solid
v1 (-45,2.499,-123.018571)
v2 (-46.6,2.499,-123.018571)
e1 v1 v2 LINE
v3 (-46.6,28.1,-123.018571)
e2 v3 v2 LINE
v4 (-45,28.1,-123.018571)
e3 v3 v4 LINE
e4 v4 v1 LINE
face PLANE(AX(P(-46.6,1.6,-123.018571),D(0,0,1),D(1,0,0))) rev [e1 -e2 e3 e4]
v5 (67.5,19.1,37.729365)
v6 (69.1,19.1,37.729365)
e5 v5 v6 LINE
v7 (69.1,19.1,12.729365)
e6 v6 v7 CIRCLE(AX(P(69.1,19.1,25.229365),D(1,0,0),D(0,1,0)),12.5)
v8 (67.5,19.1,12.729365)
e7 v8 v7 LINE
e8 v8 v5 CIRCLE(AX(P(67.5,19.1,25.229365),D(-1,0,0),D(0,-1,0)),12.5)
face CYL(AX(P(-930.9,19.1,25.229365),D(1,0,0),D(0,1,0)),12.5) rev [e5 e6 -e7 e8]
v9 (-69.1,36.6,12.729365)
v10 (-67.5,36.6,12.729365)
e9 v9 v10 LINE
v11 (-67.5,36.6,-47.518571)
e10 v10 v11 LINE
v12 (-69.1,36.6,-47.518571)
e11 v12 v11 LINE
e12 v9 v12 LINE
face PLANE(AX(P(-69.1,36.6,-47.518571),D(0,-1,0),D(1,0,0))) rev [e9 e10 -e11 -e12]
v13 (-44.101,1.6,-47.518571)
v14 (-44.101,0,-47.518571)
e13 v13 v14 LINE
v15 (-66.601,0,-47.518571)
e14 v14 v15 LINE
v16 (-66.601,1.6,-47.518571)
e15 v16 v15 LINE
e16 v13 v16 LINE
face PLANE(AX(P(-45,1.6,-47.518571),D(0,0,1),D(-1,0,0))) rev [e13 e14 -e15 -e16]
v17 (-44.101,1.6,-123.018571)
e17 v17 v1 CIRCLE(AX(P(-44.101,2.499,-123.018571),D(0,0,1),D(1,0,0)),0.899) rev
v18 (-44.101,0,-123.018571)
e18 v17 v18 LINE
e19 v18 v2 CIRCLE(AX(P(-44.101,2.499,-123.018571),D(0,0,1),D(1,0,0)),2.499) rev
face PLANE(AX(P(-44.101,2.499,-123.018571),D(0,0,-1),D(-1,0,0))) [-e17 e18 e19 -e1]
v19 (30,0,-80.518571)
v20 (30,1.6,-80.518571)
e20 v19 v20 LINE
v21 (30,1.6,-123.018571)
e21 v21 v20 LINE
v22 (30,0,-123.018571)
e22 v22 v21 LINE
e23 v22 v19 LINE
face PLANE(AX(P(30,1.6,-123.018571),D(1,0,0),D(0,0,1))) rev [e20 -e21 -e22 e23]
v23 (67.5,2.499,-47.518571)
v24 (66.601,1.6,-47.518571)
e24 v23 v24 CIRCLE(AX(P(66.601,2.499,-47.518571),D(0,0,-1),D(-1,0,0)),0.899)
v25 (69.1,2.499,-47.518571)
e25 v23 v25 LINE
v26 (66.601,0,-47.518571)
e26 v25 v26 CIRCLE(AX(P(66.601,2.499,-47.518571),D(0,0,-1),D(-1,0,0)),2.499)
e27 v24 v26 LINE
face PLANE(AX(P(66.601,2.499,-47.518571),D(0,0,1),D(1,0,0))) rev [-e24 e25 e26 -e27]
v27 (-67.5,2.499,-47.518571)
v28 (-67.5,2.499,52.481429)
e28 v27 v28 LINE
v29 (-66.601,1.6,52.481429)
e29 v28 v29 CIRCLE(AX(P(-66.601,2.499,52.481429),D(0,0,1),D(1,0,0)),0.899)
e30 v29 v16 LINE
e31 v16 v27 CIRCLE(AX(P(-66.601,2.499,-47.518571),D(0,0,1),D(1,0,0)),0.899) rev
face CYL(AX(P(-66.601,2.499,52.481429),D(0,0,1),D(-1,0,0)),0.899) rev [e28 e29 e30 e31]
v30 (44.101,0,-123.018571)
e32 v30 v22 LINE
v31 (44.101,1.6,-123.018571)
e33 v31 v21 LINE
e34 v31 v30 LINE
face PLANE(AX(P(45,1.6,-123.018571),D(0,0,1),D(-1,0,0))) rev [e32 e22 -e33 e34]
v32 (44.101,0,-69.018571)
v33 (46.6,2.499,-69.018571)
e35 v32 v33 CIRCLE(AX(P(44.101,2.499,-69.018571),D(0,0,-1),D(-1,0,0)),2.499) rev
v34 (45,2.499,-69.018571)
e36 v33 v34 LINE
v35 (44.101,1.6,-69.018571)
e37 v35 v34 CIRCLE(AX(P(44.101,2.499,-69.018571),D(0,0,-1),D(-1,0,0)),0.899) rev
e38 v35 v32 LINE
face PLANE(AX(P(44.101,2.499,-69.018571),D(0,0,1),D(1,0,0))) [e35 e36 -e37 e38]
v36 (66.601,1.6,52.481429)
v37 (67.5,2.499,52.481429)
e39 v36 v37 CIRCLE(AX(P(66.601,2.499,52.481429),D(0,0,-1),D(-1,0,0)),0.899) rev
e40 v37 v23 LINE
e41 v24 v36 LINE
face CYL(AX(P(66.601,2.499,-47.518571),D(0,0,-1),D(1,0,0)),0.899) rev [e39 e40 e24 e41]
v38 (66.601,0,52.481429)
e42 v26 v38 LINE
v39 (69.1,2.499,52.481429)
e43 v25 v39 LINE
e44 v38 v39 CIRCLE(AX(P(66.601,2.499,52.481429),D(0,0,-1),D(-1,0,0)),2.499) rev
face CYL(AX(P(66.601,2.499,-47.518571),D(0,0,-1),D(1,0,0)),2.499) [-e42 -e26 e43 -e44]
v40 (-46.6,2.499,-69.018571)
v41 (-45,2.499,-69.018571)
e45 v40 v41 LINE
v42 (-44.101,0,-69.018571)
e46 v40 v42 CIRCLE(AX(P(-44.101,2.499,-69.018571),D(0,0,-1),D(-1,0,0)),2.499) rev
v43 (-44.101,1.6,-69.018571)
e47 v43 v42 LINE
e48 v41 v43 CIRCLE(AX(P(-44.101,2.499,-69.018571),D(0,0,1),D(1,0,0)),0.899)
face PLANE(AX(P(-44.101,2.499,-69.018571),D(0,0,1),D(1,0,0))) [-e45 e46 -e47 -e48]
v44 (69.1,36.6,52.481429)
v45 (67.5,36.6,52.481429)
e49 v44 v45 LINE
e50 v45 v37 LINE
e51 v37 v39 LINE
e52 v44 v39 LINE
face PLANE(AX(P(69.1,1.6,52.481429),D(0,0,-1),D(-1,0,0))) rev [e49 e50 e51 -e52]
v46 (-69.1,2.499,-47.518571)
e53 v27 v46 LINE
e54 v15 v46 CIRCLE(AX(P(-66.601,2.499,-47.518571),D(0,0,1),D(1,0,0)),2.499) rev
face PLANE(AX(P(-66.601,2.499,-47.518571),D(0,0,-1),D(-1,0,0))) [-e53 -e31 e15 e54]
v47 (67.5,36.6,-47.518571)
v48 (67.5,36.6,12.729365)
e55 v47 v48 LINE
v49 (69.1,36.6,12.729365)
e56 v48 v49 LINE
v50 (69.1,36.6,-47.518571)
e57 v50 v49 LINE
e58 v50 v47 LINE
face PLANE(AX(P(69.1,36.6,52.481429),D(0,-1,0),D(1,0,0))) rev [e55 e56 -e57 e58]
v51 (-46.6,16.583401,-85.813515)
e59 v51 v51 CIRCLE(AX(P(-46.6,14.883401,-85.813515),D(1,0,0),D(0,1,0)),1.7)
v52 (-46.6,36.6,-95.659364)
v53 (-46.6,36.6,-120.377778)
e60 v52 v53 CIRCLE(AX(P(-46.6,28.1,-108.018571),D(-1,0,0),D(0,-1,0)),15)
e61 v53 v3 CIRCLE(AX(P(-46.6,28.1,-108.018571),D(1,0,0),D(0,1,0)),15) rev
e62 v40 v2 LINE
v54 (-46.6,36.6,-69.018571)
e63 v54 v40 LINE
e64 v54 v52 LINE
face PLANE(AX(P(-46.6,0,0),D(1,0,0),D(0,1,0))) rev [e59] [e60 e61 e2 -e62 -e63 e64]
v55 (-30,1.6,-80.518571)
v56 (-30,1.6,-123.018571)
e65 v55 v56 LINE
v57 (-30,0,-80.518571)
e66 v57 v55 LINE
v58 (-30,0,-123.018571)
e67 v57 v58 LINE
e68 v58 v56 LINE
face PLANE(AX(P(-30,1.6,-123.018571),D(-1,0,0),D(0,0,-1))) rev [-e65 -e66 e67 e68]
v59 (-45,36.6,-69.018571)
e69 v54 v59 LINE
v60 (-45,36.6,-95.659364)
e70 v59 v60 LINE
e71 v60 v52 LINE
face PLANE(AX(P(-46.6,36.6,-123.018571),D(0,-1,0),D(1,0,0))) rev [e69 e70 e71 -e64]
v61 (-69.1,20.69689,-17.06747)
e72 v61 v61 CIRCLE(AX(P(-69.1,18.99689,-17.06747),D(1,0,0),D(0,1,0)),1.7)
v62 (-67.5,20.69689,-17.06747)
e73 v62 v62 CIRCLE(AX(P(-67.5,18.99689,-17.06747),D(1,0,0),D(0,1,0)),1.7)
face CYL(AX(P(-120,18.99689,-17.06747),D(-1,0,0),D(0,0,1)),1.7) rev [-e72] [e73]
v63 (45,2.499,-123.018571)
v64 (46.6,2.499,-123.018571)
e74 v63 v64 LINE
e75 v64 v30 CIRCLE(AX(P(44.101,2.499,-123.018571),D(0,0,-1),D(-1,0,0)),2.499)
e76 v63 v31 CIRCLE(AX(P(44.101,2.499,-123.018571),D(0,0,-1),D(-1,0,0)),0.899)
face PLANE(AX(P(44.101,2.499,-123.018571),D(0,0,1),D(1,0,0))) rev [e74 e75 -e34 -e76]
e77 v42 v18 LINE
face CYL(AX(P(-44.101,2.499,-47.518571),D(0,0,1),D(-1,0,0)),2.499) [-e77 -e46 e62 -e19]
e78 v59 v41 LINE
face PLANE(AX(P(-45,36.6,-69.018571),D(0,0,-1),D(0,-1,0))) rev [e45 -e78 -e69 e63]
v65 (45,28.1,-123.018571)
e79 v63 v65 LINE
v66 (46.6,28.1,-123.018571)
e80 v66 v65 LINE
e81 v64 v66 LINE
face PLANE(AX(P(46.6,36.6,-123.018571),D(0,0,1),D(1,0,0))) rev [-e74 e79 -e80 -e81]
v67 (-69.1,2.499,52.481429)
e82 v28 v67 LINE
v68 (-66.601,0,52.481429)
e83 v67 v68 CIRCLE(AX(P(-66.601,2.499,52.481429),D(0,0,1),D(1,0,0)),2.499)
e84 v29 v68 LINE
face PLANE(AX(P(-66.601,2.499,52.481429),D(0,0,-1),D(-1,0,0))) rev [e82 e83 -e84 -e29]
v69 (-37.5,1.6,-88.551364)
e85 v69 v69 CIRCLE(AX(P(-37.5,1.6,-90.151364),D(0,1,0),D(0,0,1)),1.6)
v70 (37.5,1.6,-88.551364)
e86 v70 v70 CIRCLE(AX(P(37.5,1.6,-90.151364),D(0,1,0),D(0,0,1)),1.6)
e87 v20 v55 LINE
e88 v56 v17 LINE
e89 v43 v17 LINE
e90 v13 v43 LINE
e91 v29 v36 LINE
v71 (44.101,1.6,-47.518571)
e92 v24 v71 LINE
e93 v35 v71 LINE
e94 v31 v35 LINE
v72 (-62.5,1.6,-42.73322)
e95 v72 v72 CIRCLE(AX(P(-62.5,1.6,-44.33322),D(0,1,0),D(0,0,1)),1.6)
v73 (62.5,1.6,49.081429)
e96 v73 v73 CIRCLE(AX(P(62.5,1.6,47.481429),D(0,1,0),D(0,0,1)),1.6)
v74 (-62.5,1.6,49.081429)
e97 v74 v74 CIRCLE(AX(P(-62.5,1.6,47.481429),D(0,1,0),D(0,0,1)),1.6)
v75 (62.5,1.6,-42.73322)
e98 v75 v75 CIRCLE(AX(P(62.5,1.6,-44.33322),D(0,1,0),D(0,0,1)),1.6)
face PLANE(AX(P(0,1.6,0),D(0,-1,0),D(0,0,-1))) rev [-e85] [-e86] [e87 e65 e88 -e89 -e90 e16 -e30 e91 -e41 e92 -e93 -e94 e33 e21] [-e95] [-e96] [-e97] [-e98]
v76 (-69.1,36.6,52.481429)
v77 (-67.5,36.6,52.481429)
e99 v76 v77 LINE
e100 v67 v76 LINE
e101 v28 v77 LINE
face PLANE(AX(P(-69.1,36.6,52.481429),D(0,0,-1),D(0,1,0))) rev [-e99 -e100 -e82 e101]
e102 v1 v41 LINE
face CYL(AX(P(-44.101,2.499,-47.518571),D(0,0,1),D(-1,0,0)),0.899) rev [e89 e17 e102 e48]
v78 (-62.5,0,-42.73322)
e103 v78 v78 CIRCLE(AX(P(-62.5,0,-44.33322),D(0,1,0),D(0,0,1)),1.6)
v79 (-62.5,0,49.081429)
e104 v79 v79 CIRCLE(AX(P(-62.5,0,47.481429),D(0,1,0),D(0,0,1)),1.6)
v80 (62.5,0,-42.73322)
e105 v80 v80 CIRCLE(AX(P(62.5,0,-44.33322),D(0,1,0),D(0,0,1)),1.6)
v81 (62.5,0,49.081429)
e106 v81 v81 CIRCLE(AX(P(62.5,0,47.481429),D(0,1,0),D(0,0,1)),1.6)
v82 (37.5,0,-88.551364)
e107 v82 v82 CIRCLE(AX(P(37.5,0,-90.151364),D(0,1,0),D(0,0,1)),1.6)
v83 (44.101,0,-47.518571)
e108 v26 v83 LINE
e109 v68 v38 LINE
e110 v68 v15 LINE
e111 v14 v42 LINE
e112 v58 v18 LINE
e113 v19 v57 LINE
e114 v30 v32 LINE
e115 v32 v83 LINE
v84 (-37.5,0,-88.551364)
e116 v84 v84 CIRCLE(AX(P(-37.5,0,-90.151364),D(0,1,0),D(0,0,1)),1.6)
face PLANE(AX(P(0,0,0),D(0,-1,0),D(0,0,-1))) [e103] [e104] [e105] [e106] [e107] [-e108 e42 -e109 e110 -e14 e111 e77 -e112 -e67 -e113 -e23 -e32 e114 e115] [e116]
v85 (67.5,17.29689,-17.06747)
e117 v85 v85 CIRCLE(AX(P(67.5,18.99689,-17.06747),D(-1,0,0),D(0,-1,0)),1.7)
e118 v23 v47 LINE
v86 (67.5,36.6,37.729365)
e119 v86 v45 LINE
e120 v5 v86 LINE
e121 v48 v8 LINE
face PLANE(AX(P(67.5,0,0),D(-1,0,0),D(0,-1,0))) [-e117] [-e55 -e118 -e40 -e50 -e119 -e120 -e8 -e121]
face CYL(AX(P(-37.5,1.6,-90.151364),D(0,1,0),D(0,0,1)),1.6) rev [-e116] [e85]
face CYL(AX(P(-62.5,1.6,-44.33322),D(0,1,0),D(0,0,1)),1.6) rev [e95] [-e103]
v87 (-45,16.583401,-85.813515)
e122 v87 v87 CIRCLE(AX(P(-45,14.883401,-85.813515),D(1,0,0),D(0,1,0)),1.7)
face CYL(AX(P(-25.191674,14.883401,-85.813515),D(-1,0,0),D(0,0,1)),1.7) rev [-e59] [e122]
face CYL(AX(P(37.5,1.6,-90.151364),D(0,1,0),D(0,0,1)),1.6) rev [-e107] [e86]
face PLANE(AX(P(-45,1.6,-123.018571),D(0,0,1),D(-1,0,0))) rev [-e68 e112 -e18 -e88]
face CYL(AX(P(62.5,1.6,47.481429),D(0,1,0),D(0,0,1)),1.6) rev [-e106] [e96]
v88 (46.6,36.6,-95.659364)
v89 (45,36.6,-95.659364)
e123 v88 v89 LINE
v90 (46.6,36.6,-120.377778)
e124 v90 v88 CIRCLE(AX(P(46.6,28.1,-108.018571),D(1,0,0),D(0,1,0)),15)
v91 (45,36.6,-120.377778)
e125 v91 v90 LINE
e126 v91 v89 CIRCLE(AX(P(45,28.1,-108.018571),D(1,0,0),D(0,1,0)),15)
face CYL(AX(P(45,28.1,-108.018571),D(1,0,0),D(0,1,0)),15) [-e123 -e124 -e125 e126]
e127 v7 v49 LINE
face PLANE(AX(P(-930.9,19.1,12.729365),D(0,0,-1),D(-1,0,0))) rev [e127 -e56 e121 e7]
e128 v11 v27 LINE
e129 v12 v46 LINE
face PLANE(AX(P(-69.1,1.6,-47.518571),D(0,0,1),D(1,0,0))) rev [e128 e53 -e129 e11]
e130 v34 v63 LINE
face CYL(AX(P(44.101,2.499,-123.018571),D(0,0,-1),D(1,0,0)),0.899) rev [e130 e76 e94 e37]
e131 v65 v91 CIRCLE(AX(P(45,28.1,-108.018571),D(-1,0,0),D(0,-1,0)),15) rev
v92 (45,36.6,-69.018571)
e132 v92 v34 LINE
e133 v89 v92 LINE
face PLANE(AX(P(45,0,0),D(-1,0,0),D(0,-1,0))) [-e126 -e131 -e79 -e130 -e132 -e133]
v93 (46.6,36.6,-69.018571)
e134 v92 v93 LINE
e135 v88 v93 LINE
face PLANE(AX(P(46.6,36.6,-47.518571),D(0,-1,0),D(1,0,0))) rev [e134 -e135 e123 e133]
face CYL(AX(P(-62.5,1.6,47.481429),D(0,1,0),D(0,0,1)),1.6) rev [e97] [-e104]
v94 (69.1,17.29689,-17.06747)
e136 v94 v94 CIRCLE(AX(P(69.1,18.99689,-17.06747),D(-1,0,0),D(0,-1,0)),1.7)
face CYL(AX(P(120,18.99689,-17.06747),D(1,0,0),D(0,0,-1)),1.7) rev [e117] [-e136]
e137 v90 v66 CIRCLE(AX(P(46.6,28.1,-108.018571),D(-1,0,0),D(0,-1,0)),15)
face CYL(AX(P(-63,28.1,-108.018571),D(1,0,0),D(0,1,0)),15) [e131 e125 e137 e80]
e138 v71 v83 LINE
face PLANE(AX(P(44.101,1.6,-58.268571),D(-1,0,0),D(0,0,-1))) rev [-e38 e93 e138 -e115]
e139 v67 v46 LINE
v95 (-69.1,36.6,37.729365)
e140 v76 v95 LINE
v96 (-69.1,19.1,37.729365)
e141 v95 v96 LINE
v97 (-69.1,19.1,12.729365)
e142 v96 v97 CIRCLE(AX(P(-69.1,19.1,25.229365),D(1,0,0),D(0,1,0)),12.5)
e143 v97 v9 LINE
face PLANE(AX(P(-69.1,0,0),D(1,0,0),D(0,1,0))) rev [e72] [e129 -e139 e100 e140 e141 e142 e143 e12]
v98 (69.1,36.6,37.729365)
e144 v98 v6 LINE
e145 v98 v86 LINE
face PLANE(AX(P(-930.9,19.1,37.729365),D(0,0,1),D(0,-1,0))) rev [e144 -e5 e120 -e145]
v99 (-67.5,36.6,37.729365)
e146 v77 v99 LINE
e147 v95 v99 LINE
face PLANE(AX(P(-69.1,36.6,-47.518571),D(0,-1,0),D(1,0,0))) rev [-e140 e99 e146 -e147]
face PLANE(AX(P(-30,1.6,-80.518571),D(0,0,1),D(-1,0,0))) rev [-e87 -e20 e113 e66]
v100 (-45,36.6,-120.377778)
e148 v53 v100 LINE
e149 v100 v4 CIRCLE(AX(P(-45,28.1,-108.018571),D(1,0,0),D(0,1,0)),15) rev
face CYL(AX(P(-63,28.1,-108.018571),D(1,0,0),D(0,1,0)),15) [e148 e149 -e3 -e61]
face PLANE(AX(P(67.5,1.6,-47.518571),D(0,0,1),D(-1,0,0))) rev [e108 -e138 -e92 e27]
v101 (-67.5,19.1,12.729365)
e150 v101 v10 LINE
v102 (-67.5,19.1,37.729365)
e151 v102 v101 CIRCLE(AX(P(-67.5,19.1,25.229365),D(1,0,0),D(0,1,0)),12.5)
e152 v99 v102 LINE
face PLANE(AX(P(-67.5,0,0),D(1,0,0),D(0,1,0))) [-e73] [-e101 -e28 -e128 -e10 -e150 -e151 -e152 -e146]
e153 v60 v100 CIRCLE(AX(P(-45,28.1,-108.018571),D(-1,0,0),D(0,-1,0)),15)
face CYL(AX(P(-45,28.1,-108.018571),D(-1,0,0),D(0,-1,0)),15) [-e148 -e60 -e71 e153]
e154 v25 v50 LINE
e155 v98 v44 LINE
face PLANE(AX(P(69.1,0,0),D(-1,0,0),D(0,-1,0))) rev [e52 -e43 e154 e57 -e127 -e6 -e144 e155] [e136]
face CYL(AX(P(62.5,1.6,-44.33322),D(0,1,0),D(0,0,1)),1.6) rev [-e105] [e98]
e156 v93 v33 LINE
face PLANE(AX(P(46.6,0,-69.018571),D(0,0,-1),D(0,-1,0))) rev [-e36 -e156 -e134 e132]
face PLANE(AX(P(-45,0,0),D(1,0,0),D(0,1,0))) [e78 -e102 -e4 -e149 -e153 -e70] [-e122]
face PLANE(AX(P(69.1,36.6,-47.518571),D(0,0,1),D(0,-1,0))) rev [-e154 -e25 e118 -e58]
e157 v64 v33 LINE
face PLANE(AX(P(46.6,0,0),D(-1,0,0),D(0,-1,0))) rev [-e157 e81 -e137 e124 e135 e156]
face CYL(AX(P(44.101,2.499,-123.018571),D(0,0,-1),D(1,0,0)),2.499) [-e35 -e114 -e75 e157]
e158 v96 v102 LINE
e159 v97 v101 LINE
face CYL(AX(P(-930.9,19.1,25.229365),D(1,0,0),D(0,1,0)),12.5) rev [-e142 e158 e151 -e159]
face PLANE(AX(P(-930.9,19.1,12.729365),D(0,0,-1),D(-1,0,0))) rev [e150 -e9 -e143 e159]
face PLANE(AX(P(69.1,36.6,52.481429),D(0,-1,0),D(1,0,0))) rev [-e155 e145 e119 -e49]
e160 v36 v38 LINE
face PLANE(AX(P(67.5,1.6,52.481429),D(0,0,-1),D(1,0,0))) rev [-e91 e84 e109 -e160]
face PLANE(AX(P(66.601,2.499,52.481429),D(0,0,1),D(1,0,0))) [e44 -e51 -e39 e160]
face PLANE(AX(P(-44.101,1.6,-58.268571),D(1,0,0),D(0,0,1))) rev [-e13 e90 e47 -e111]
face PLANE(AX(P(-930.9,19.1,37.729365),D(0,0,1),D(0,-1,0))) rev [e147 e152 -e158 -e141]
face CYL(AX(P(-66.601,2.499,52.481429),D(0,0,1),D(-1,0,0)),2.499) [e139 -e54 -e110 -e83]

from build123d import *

# Parameters (mm, degrees)
BOSS_EXTRUDE2_DEPTH            = 1.6
EDGE_FLANGE1_STRIP_W           = 8.198
EDGE_FLANGE1_STRIP_H           = 1.6
EDGE_FLANGE1_STRIP_CUT_DEPTH   = 100
EDGE_FLANGE1_STRIP_2_W         = 8.198
EDGE_FLANGE1_STRIP_2_H         = 1.6
EDGE_FLANGE1_STRIP_CUT_2_DEPTH = 75.5
EDGE_FLANGE1_STRIP_3_W         = 8.198
EDGE_FLANGE1_STRIP_3_H         = 1.6
EDGE_FLANGE1_STRIP_CUT_3_DEPTH = 75.5
EDGE_FLANGE1_STRIP_4_W         = 8.198
EDGE_FLANGE1_STRIP_4_H         = 1.6
EDGE_FLANGE1_STRIP_CUT_4_DEPTH = 100
EDGE_FLANGE1_DEPTH             = 100
EDGE_FLANGE1_BEND_DEPTH        = 75.5
EDGE_FLANGE1_BEND_2_DEPTH      = 75.5
EDGE_FLANGE1_BEND_3_DEPTH      = 100
CUT_EXTRUDE1_START             = -69.018571159
CUT_EXTRUDE1_DEPTH             = 21.5
SKETCH24_R                     = 15
BOSS_EXTRUDE3_DEPTH            = 1.6
BOSS_EXTRUDE4_START            = -1.6
SKETCH25_R                     = 15
BOSS_EXTRUDE4_DEPTH            = 1.6
CUT_EXTRUDE2_DEPTH             = 109.6
CUT_EXTRUDE3_DEPTH             = 1000
M3_CLEARANCE_HOLE1_D           = 3.2
HOLE1_D                        = 3.4
HOLE1_DEPTH                    = 67.5
HOLE1_CBORE_D                  = 6
HOLE1_CBORE_DEPTH              = 16
CUT_EXTRUDE4_REACH             = 180.195
SKETCH36_R                     = 1.7


# Read off the part's stored shape, not the designer's step: Cut-Extrude1
# Sheet-metal steps are written as plain solids
with BuildPart() as part:
    # Sketch1 → Boss-Extrude2 (new body)
    with BuildSketch(Plane(origin=(0, 0, 0), x_dir=(1, 0, 0), z_dir=(0, 1, 0))):
        Polygon((45, 47.518571159), (45, 123.018571159), (30, 123.018571159), (30, 80.518571159), (-30, 80.518571159), (-30, 123.018571159), (-45, 123.018571159), (-45, 47.518571159), (-67.5, 47.518571159), (-67.5, -52.481428841), (67.5, -52.481428841), (67.5, 47.518571159), align=None)
    extrude(amount=BOSS_EXTRUDE2_DEPTH)

    # Edge-Flange1 strip (across the edge) → Edge-Flange1 strip cut (cut)
    with BuildSketch(Plane(origin=(-67.5, 1.6, -47.518571159), x_dir=(1, 0, 0), z_dir=(0, 0, 1))):
        with Locations((-3.2, -0.8)):
            Rectangle(EDGE_FLANGE1_STRIP_W, EDGE_FLANGE1_STRIP_H)
    extrude(amount=EDGE_FLANGE1_STRIP_CUT_DEPTH, mode=Mode.SUBTRACT)

    # Edge-Flange1 strip 2 (across the edge) → Edge-Flange1 strip cut 2 (cut)
    with BuildSketch(Plane(origin=(-45, 1.6, -123.018571159), x_dir=(1, 0, 0), z_dir=(0, 0, 1))):
        with Locations((-3.2, -0.8)):
            Rectangle(EDGE_FLANGE1_STRIP_2_W, EDGE_FLANGE1_STRIP_2_H)
    extrude(amount=EDGE_FLANGE1_STRIP_CUT_2_DEPTH, mode=Mode.SUBTRACT)

    # Edge-Flange1 strip 3 (across the edge) → Edge-Flange1 strip cut 3 (cut)
    with BuildSketch(Plane(origin=(45, 1.6, -47.518571159), x_dir=(-1, 0, 0), z_dir=(0, 0, -1))):
        with Locations((-3.2, -0.8)):
            Rectangle(EDGE_FLANGE1_STRIP_3_W, EDGE_FLANGE1_STRIP_3_H)
    extrude(amount=EDGE_FLANGE1_STRIP_CUT_3_DEPTH, mode=Mode.SUBTRACT)

    # Edge-Flange1 strip 4 (across the edge) → Edge-Flange1 strip cut 4 (cut)
    with BuildSketch(Plane(origin=(67.5, 1.6, 52.481428841), x_dir=(-1, 0, 0), z_dir=(0, 0, -1))):
        with Locations((-3.2, -0.8)):
            Rectangle(EDGE_FLANGE1_STRIP_4_W, EDGE_FLANGE1_STRIP_4_H)
    extrude(amount=EDGE_FLANGE1_STRIP_CUT_4_DEPTH, mode=Mode.SUBTRACT)

    # Edge-Flange1 section (across the edge) → Edge-Flange1 (add)
    with BuildSketch(Plane(origin=(-67.5, 1.6, -47.518571159), x_dir=(1, 0, 0), z_dir=(0, 0, 1))):
        with BuildLine():
            Line((-1.6, 0.899), (-1.6, 35))
            Line((-1.6, 35), (0, 35))
            Line((0, 35), (0, 0.899))
            ThreePointArc((0, 0.899), (0.263311004, 0.263311004), (0.899, 0))
            Line((0.899, 0), (0.899, -1.6))
            ThreePointArc((0.899, -1.6), (-0.868059846, -0.868059846), (-1.6, 0.899))
        make_face()
    extrude(amount=EDGE_FLANGE1_DEPTH)

    # Edge-Flange1 section 2 (across the edge) → Edge-Flange1 bend (add)
    with BuildSketch(Plane(origin=(-45, 1.6, -123.018571159), x_dir=(1, 0, 0), z_dir=(0, 0, 1))):
        with BuildLine():
            Line((-1.6, 0.899), (-1.6, 35))
            Line((-1.6, 35), (0, 35))
            Line((0, 35), (0, 0.899))
            ThreePointArc((0, 0.899), (0.263311004, 0.263311004), (0.899, 0))
            Line((0.899, 0), (0.899, -1.6))
            ThreePointArc((0.899, -1.6), (-0.868059846, -0.868059846), (-1.6, 0.899))
        make_face()
    extrude(amount=EDGE_FLANGE1_BEND_DEPTH)

    # Edge-Flange1 section 3 (across the edge) → Edge-Flange1 bend 2 (add)
    with BuildSketch(Plane(origin=(45, 1.6, -47.518571159), x_dir=(-1, 0, 0), z_dir=(0, 0, -1))):
        with BuildLine():
            Line((-1.6, 0.899), (-1.6, 35))
            Line((-1.6, 35), (0, 35))
            Line((0, 35), (0, 0.899))
            ThreePointArc((0, 0.899), (0.263311004, 0.263311004), (0.899, 0))
            Line((0.899, 0), (0.899, -1.6))
            ThreePointArc((0.899, -1.6), (-0.868059846, -0.868059846), (-1.6, 0.899))
        make_face()
    extrude(amount=EDGE_FLANGE1_BEND_2_DEPTH)

    # Edge-Flange1 section 4 (across the edge) → Edge-Flange1 bend 3 (add)
    with BuildSketch(Plane(origin=(67.5, 1.6, 52.481428841), x_dir=(-1, 0, 0), z_dir=(0, 0, -1))):
        with BuildLine():
            Line((-1.6, 0.899), (-1.6, 35))
            Line((-1.6, 35), (0, 35))
            Line((0, 35), (0, 0.899))
            ThreePointArc((0, 0.899), (0.263311004, 0.263311004), (0.899, 0))
            Line((0.899, 0), (0.899, -1.6))
            ThreePointArc((0.899, -1.6), (-0.868059846, -0.868059846), (-1.6, 0.899))
        make_face()
    extrude(amount=EDGE_FLANGE1_BEND_3_DEPTH)

    # Cut-Extrude1 outline → Cut-Extrude1 (cut)
    with BuildSketch(Plane.XY.offset(CUT_EXTRUDE1_START)):
        with BuildLine():
            ThreePointArc((45, 2.499), (44.736688996, 1.863311004), (44.101, 1.6))
            Line((44.101, 1.6), (44.101, 0))
            ThreePointArc((44.101, 0), (45.868059846, 0.731940154), (46.6, 2.499))
            Line((46.6, 2.499), (46.6, 36.6))
            Line((46.6, 36.6), (45, 36.6))
            Line((45, 36.6), (45, 2.499))
        make_face()
        with BuildLine():
            ThreePointArc((-46.6, 2.499), (-45.868059846, 0.731940154), (-44.101, 0))
            Line((-44.101, 0), (-44.101, 1.6))
            ThreePointArc((-44.101, 1.6), (-44.736688996, 1.863311004), (-45, 2.499))
            Line((-45, 2.499), (-45, 36.6))
            Line((-45, 36.6), (-46.6, 36.6))
            Line((-46.6, 36.6), (-46.6, 2.499))
        make_face()
    extrude(amount=CUT_EXTRUDE1_DEPTH, mode=Mode.SUBTRACT)

    # Sketch24 → Boss-Extrude3 (add)
    with BuildSketch(Plane(origin=(46.6, 0, 0), x_dir=(0, 0, -1), z_dir=(1, 0, 0))):
        with Locations((108.018571159, 28.1)):
            Circle(SKETCH24_R)
    extrude(amount=-BOSS_EXTRUDE3_DEPTH)

    # Sketch25 → Boss-Extrude4 (add)
    with BuildSketch(Plane.ZY.offset(46.6).offset(BOSS_EXTRUDE4_START)):
        with Locations((-108.018571159, 28.1)):
            Circle(SKETCH25_R)
    extrude(amount=BOSS_EXTRUDE4_DEPTH)

    # Sketch26 → Cut-Extrude2 (cut)
    with BuildSketch(Plane(origin=(46.6, 0, 0), x_dir=(0, 0, -1), z_dir=(1, 0, 0))):
        with BuildLine():
            Line((120.377778253, 36.6), (123.018571159, 36.6))
            Line((123.018571159, 36.6), (123.018571159, 28.1))
            ThreePointArc((123.018571159, 28.1), (122.343167251, 32.550387263), (120.377778253, 36.6))
        make_face()
    extrude(amount=-CUT_EXTRUDE2_DEPTH, mode=Mode.SUBTRACT)

    # Sketch27 → Cut-Extrude3 (cut)
    with BuildSketch(Plane(origin=(69.1, 0, 0), x_dir=(0, 0, -1), z_dir=(1, 0, 0))):
        with BuildLine():
            Line((-37.729365474, 19.100000095), (-37.729365474, 36.6))
            Line((-37.729365474, 36.6), (-12.729365474, 36.6))
            Line((-12.729365474, 36.6), (-12.729365474, 19.100000095))
            ThreePointArc((-12.729365474, 19.100000095), (-25.229365474, 6.600000095), (-37.729365474, 19.100000095))
        make_face()
    extrude(amount=-CUT_EXTRUDE3_DEPTH, mode=Mode.SUBTRACT)

    # M3 Clearance Hole1 (through all)
    with Locations(Plane(origin=(0, 1.6, -32.518571159), x_dir=(-1, 0, 0), z_dir=(0, 1, 0))):
        with Locations((-62.5, -11.814648696), (62.5, -11.814648696), (62.5, 80), (-62.5, 80), (-37.5, -57.632792906), (37.5, -57.632792906)):
            Hole(M3_CLEARANCE_HOLE1_D / 2)

    # Hole1
    with Locations(Plane(origin=(120, 6.6, -32.518571159), x_dir=(0, 0, 1), z_dir=(1, 0, 0))):
        with Locations((15.451100734, -12.39688985)):
            hole1 = CounterBoreHole(HOLE1_D / 2, HOLE1_CBORE_D / 2, HOLE1_CBORE_DEPTH, depth=HOLE1_DEPTH)

    # Mirror1: Hole1 across Right Plane
    add(hole1.mirror(Plane(origin=(0, 0, 0), x_dir=(0, 0, -1), z_dir=(1, 0, 0))), mode=Mode.SUBTRACT)

    # Sketch36 → Cut-Extrude4 (cut, up to next)
    with BuildSketch(Plane(origin=(-80, 6.6, -32.518571159), x_dir=(0, 0, 1), z_dir=(-1, 0, 0)), mode=Mode.PRIVATE) as cut_extrude4_sk1:
        with Locations(Location((-53.294944095, 8.283400622, 0), (0, 0, 90))):
            Circle(SKETCH36_R)
    cut_extrude4_tool1 = extrude(cut_extrude4_sk1.sketch, amount=-CUT_EXTRUDE4_REACH, mode=Mode.PRIVATE) & part.part
    add(cut_extrude4_tool1.solids().sort_by_distance((-80, 14.883401, -85.813515))[0], mode=Mode.SUBTRACT)


solid = part.part
